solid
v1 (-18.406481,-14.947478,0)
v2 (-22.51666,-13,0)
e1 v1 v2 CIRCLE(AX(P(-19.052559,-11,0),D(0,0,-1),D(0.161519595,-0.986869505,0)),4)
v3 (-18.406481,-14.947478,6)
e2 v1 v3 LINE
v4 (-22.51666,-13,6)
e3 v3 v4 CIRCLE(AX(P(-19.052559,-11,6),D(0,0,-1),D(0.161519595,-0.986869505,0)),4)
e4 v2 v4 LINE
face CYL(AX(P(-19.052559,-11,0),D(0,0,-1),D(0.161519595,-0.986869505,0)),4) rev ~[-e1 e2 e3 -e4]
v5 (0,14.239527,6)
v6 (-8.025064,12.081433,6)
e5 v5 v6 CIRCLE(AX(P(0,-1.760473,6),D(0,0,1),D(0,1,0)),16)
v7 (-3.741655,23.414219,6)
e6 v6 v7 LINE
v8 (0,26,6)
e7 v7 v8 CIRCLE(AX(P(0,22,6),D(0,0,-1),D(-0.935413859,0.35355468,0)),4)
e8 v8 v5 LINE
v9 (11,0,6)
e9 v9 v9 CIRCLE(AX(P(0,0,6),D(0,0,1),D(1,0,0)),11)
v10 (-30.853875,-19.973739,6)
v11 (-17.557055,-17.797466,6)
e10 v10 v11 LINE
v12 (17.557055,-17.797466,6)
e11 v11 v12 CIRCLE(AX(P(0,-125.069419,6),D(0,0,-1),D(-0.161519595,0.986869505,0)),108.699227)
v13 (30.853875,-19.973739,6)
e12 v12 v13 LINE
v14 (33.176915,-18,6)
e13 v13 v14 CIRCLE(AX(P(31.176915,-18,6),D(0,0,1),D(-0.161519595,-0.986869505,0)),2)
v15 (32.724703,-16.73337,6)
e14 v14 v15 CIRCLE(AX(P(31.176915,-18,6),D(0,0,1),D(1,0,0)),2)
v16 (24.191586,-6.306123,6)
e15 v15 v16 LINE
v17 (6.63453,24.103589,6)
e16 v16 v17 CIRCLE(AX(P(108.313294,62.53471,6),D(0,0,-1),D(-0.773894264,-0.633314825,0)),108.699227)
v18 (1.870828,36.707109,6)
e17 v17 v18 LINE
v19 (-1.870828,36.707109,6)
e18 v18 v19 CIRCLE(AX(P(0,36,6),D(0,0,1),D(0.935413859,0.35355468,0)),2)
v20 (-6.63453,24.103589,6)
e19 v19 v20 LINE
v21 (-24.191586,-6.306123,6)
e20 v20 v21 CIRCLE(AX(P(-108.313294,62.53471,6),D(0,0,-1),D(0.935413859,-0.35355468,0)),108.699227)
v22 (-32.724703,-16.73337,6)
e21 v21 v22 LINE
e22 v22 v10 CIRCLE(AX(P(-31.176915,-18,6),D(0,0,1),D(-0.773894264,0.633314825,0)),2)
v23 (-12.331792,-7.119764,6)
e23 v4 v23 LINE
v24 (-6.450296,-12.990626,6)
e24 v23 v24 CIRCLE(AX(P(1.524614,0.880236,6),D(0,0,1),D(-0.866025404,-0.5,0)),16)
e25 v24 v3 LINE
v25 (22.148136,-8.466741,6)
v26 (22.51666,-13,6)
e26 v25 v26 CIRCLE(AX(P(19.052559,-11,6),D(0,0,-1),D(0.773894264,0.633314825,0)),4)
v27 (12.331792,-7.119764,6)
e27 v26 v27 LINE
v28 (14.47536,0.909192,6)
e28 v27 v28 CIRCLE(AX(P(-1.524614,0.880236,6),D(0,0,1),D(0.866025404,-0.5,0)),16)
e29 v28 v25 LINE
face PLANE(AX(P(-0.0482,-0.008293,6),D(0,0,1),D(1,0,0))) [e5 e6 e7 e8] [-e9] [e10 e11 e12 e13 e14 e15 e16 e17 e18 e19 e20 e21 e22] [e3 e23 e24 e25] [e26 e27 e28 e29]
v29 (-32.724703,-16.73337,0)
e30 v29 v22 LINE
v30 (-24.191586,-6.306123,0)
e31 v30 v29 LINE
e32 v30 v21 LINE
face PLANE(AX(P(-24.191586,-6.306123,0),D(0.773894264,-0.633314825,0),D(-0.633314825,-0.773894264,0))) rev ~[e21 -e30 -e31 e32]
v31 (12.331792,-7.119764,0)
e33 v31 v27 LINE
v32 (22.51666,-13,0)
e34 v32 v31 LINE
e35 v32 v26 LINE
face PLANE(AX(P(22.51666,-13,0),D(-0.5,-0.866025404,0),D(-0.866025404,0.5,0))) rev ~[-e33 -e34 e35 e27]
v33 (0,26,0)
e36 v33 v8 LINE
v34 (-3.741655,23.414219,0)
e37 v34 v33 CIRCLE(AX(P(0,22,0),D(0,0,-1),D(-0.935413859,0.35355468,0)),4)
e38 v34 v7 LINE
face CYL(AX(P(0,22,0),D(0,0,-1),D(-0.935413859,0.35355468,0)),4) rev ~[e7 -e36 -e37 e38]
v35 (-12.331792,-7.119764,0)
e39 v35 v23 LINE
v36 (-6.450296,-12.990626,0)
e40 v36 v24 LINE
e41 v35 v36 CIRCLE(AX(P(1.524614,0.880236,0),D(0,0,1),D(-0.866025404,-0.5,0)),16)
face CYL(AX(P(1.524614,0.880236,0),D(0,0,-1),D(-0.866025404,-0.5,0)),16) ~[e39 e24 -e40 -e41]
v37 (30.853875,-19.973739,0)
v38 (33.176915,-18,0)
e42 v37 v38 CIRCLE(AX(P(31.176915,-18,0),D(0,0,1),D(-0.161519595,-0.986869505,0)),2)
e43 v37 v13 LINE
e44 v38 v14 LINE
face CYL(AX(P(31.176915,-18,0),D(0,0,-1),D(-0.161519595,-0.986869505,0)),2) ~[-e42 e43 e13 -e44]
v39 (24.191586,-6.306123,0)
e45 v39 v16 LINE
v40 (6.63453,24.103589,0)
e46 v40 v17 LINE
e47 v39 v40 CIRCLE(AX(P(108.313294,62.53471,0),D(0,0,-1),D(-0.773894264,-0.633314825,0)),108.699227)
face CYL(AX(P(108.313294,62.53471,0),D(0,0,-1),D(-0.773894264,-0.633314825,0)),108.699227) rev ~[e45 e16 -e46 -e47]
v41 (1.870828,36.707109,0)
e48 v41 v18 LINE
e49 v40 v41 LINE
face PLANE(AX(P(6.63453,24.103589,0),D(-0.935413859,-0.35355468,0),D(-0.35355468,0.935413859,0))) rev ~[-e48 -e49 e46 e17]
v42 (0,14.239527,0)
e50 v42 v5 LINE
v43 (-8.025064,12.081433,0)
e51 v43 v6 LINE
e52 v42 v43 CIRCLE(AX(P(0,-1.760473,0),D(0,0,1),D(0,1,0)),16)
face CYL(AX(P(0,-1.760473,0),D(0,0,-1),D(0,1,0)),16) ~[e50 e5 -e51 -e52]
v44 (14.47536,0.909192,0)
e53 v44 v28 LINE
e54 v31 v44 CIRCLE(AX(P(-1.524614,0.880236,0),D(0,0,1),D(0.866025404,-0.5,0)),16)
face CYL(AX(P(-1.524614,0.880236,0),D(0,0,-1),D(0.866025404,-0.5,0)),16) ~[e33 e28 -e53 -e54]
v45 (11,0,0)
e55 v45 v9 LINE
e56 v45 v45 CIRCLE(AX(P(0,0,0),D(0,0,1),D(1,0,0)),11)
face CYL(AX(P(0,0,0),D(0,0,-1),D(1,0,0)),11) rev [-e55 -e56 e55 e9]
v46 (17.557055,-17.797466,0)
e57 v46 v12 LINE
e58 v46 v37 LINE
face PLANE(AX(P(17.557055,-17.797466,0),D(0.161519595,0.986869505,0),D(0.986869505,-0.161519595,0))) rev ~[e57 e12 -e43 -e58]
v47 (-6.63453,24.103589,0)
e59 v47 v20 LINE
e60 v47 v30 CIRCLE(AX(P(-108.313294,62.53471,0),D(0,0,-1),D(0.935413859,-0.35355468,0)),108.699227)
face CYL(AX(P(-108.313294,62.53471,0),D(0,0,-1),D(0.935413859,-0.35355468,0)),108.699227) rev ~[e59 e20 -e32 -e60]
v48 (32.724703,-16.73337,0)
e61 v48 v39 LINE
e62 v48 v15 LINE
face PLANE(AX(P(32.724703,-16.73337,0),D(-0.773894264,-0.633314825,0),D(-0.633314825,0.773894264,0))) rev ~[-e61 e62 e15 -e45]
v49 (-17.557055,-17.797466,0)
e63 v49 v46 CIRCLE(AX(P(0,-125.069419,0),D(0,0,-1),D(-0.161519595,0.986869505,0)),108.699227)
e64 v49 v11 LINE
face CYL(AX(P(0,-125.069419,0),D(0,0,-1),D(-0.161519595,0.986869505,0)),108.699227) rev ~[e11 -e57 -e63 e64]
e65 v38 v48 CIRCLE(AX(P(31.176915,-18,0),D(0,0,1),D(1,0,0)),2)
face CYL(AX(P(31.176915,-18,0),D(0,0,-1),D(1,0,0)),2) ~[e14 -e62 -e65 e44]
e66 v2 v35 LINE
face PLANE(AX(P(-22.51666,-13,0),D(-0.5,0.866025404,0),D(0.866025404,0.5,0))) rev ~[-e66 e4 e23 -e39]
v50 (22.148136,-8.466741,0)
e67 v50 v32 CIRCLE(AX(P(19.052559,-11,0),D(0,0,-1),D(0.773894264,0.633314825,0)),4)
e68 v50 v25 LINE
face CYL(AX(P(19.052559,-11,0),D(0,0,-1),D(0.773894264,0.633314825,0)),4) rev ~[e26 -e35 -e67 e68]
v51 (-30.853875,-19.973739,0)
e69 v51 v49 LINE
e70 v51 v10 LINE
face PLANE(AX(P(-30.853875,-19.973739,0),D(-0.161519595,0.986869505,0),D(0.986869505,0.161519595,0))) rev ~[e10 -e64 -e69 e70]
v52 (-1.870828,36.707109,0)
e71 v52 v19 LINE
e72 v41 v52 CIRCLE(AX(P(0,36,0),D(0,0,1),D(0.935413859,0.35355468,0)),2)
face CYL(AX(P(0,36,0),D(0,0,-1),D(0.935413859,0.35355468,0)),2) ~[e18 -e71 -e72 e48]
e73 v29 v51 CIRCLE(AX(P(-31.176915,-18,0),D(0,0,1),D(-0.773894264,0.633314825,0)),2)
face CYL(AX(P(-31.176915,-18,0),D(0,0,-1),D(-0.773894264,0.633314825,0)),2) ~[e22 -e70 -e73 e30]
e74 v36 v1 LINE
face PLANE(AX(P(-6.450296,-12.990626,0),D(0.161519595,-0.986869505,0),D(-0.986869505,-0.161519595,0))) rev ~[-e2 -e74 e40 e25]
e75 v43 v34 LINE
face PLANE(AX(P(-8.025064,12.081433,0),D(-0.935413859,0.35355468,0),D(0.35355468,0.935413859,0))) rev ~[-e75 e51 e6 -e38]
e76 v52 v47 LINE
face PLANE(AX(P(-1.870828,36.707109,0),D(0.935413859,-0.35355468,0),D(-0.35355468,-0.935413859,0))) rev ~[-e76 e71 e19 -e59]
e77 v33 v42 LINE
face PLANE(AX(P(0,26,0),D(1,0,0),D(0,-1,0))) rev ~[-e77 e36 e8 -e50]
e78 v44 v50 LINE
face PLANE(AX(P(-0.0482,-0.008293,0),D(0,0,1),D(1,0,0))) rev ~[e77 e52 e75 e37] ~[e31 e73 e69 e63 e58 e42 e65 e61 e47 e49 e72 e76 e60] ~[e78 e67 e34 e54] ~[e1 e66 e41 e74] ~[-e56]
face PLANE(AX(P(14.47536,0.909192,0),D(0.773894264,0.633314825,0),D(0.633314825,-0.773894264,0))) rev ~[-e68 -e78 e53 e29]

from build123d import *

# Parameters (mm, degrees)
F0_R     = 11
F1_DEPTH = 6


# Not quite as in the source:
# - a feature names something its author has since deleted; it is built from what else it names


with BuildPart() as f1:
    # F0 (on Top) → F1 (new body)
    with BuildSketch(Plane.XY):
        with BuildLine():
            ThreePointArc((1.8708277189, 36.7071093595), (1.9674419226, 36.3594054551), (2, 36))
            ThreePointArc((2, 36), (-0.3594054551, 34.0325580774), (-1.8708277189, 36.7071093595))
            Line((-1.8708277189, 36.7071093595), (-6.6345304801, 24.1035890545))
            ThreePointArc((-6.6345304801, 24.1035890545), (-14.1770019873, 8.1850959137), (-24.1915856836, -6.3061225893))
            Line((-24.1915856836, -6.3061225893), (-32.7247030643, -16.7333703491))
            ThreePointArc((-32.7247030643, -16.7333703491), (-30.5044478293, -16.116442587), (-29.1769145362, -18))
            ThreePointArc((-29.1769145362, -18), (-29.6527625783, -19.2949752156), (-30.8538753454, -19.9737390104))
            Line((-30.8538753454, -19.9737390104), (-17.5570552035, -17.7974664652))
            ThreePointArc((-17.5570552035, -17.7974664652), (0, -16.3701918273), (17.5570552035, -17.7974664652))
            Line((17.5570552035, -17.7974664652), (30.8538753454, -19.9737390104))
            ThreePointArc((30.8538753454, -19.9737390104), (29.4448637287, -17), (32.7247030643, -16.7333703491))
            Line((32.7247030643, -16.7333703491), (24.1915856836, -6.3061225893))
            ThreePointArc((24.1915856836, -6.3061225893), (14.1770019873, 8.1850959137), (6.6345304801, 24.1035890545))
            Line((6.6345304801, 24.1035890545), (1.8708277189, 36.7071093595))
        make_face()
        with BuildLine():
            ThreePointArc((-18.4064805015, -14.9474780208), (-20.765299785, -14.6147639762), (-22.5166604984, -13))
            Line((-22.5166604984, -13), (-12.3317924474, -7.1197636891))
            ThreePointArc((-12.3317924474, -7.1197636891), (-9.7788523145, -10.4437050957), (-6.4502961482, -12.9906255195))
            Line((-6.4502961482, -12.9906255195), (-18.4064805015, -14.9474780208))
        make_face(mode=Mode.SUBTRACT)
        with BuildLine():
            ThreePointArc((22.1481359393, -8.4667406982), (23.0394067662, -10.6758951429), (22.5166604984, -13))
            Line((22.5166604984, -13), (12.3317924474, -7.1197636891))
            ThreePointArc((12.3317924474, -7.1197636891), (13.9339400798, -3.2468819763), (14.4753597851, 0.9091924335))
            Line((14.4753597851, 0.9091924335), (22.1481359393, -8.4667406982))
        make_face(mode=Mode.SUBTRACT)
        Circle(F0_R, mode=Mode.SUBTRACT)
        with BuildLine():
            ThreePointArc((-3.7416554378, 23.414218719), (-2.2741069812, 25.2906591191), (0, 26))
            Line((0, 26), (0, 14.2395273782))
            ThreePointArc((0, 14.2395273782), (-4.1550877653, 13.6905870721), (-8.0250636368, 12.0814330861))
            Line((-8.0250636368, 12.0814330861), (-3.7416554378, 23.414218719))
        make_face(mode=Mode.SUBTRACT)
        with BuildLine():
            ThreePointArc((-1.8708277189, 36.7071093595), (-0.3594054551, 34.0325580774), (2, 36))
            ThreePointArc((2, 36), (1.9674419226, 36.3594054551), (1.8708277189, 36.7071093595))
            ThreePointArc((1.8708277189, 36.7071093595), (0, 38), (-1.8708277189, 36.7071093595))
        make_face()
        with BuildLine():
            ThreePointArc((33.1769145362, -18), (33.0604719492, -17.327533293), (32.7247030643, -16.7333703491))
            ThreePointArc((32.7247030643, -16.7333703491), (29.4448637287, -17), (30.8538753454, -19.9737390104))
            ThreePointArc((30.8538753454, -19.9737390104), (32.4718897519, -19.5241519579), (33.1769145362, -18))
        make_face()
        with BuildLine():
            ThreePointArc((-29.1769145362, -18), (-30.5044478293, -16.116442587), (-32.7247030643, -16.7333703491))
            ThreePointArc((-32.7247030643, -16.7333703491), (-32.9089653438, -19), (-30.8538753454, -19.9737390104))
            ThreePointArc((-30.8538753454, -19.9737390104), (-29.6527625783, -19.2949752156), (-29.1769145362, -18))
        make_face()
    extrude(amount=F1_DEPTH)


solid = f1.part
